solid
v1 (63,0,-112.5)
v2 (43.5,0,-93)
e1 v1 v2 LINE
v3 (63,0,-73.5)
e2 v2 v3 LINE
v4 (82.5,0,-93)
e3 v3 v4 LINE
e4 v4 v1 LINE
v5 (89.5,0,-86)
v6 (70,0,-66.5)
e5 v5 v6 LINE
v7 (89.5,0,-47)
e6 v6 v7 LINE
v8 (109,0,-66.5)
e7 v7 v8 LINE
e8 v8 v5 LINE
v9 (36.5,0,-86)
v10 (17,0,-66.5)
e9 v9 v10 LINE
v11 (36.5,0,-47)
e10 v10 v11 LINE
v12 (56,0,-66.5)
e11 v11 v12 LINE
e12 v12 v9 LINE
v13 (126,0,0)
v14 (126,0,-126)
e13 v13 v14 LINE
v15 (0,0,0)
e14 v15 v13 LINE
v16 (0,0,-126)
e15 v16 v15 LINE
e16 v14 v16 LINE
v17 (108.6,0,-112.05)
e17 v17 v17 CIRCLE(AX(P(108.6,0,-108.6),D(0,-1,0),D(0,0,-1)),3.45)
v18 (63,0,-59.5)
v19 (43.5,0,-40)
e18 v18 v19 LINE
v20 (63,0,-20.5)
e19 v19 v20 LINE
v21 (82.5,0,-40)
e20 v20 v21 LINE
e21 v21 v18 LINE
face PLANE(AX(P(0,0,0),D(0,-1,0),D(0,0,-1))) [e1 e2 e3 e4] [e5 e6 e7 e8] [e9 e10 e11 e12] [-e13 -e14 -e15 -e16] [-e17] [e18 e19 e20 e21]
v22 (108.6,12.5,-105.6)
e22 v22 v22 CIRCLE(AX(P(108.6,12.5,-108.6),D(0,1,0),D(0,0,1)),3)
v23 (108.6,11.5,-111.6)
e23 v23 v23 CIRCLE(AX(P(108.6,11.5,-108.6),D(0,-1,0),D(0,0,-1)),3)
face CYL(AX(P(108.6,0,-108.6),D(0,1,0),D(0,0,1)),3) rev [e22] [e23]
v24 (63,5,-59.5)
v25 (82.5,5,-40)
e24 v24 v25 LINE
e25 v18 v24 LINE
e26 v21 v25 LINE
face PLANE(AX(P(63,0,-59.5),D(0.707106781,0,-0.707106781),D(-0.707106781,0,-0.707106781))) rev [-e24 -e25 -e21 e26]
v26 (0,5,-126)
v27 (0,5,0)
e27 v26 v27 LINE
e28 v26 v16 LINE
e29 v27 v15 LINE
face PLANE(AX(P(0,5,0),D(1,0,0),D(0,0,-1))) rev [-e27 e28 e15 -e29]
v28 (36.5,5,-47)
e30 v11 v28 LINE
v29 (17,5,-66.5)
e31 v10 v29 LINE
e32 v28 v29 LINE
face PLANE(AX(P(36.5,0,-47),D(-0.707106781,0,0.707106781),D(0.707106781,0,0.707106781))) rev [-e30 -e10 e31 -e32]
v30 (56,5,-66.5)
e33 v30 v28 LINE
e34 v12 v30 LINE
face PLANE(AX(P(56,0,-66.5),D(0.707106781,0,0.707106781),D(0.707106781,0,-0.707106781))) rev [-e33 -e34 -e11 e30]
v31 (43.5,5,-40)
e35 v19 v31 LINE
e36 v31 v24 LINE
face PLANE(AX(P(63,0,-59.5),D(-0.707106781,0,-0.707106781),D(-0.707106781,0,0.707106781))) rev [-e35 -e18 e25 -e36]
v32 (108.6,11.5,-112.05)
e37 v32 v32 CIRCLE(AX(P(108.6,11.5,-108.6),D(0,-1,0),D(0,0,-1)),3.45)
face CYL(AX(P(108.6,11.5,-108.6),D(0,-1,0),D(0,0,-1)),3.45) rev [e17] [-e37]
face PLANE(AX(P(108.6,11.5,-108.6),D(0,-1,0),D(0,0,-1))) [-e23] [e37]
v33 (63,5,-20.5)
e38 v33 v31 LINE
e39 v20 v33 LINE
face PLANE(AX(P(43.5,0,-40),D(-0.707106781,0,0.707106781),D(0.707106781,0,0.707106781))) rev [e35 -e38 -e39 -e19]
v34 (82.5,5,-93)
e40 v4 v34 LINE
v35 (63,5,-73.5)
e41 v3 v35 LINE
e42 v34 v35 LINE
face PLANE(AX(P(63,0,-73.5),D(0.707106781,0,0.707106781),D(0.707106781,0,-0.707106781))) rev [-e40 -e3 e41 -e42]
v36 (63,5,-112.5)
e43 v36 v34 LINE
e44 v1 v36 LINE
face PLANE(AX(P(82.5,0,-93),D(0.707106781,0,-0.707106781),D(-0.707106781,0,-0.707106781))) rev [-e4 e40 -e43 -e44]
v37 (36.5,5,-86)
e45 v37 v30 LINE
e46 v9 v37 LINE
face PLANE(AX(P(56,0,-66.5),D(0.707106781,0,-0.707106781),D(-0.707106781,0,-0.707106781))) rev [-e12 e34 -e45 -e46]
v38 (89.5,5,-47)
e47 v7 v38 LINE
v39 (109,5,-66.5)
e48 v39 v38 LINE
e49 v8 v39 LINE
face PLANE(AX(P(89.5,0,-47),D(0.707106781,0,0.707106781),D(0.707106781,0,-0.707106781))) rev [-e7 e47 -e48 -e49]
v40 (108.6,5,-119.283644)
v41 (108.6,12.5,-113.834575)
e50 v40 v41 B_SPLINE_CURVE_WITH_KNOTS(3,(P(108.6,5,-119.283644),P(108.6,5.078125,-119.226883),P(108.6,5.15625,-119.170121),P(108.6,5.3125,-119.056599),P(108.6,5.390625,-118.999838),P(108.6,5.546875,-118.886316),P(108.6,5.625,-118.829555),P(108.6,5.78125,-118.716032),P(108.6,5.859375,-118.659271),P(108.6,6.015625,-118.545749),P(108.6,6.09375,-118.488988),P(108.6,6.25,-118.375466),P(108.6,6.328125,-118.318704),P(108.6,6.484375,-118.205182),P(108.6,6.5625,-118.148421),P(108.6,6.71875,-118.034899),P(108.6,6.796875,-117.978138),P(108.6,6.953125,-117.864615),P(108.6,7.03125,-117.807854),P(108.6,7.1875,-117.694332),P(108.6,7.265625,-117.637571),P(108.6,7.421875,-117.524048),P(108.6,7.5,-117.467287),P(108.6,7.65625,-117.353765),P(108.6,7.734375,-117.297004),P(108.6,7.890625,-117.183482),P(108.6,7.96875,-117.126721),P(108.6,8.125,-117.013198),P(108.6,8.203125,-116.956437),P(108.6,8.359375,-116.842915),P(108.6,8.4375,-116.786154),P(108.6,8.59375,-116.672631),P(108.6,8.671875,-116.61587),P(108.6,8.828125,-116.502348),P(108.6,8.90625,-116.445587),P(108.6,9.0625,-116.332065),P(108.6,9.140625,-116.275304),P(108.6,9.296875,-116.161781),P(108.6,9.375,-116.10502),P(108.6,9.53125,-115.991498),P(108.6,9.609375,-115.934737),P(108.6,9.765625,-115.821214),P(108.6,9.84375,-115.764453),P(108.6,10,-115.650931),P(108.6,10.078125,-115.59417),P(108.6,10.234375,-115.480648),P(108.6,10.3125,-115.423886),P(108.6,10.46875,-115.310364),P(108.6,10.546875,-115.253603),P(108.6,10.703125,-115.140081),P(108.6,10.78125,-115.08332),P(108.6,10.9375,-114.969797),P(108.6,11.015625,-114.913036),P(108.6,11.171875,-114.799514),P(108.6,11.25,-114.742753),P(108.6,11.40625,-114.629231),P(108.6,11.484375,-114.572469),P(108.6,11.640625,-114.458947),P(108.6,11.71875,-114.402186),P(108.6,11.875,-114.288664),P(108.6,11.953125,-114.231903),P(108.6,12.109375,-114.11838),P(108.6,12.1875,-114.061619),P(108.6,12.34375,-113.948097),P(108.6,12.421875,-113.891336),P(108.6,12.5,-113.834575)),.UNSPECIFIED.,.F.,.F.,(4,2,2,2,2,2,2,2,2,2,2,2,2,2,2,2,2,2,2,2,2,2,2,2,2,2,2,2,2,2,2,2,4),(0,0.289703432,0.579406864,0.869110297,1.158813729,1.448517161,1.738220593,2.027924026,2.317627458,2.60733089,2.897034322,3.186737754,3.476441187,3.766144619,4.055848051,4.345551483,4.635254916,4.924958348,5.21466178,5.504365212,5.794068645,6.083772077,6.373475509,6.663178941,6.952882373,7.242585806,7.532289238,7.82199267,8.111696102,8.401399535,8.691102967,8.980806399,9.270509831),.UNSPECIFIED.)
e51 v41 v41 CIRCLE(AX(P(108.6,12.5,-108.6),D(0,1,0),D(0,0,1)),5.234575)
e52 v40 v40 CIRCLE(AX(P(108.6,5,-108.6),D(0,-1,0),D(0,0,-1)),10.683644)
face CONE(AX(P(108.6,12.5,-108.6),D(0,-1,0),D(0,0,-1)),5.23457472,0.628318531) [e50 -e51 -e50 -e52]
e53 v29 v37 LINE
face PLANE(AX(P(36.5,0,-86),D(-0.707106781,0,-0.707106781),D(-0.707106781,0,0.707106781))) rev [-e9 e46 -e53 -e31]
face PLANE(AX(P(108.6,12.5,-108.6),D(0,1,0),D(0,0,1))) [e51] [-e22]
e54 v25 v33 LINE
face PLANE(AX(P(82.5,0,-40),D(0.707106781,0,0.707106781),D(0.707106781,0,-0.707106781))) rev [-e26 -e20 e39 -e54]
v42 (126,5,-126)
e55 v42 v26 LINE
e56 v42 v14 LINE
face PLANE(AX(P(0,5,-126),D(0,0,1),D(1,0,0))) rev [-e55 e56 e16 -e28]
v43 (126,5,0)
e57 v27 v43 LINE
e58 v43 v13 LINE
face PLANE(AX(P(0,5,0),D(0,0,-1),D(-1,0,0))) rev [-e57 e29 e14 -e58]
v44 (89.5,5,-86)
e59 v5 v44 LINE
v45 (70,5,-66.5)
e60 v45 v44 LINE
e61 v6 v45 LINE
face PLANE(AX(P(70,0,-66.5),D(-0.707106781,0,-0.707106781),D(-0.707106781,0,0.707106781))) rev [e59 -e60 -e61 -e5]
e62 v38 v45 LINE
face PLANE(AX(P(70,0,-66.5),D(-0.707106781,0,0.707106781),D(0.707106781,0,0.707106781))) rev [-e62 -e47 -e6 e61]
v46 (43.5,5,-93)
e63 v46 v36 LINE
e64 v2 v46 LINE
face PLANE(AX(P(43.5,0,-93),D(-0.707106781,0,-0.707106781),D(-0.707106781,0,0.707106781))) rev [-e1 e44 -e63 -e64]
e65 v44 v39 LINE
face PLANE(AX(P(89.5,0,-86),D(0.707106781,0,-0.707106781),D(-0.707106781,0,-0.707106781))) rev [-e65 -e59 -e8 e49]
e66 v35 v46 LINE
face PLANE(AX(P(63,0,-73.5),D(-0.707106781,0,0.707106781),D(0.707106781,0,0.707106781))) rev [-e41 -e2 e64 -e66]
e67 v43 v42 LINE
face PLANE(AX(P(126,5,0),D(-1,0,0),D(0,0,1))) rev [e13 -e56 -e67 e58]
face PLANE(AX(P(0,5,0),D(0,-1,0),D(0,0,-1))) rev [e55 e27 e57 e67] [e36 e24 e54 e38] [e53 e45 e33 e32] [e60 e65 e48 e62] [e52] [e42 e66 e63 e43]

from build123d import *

# Parameters (mm, degrees)
SKETCH1_W               = 126
SKETCH1_H               = 126
BOSS_EXTRUDE1_DEPTH     = 5
SKETCH3_R               = 12.5
BOSS_EXTRUDE2_DEPTH     = 7.5
SKETCH4_R               = 3.45
CUT_EXTRUDE1_DEPTH      = 11.5
SKETCH6_R               = 3
CUT_EXTRUDE2_DEPTH      = 179.628805068
CHAMFER1_SIZE           = 10
CHAMFER1_SIZE_2         = 7.26542528
CUT_EXTRUDE3_DEPTH      = 179.348675353
CUT_EXTRUDE3_DEPTH_BACK = 179.348675353


with BuildPart() as part:
    # Sketch1 → Boss-Extrude1 (new body)
    with BuildSketch(Plane(origin=(0, 0, 0), x_dir=(1, 0, 0), z_dir=(0, 1, 0))):
        with Locations((63, 63)):
            Rectangle(SKETCH1_W, SKETCH1_H)
    extrude(amount=BOSS_EXTRUDE1_DEPTH)

    # Sketch3 → Boss-Extrude2 (add)
    with BuildSketch(Plane(origin=(0, 5, 0), x_dir=(1, 0, 0), z_dir=(0, 1, 0))):
        with Locations(Location((108.6, 108.6, 0), (0, 0, 90))):
            Circle(SKETCH3_R)
    extrude(amount=BOSS_EXTRUDE2_DEPTH)

    # Sketch4 → Cut-Extrude1 (cut)
    with BuildSketch(Plane.XZ):
        with Locations(Location((108.6, -108.6, 0), (0, 0, 270))):
            Circle(SKETCH4_R)
    extrude(amount=-CUT_EXTRUDE1_DEPTH, mode=Mode.SUBTRACT)

    # Sketch6 → Cut-Extrude2 (cut, through all)
    with BuildSketch(Plane(origin=(0, 12.5, 0), x_dir=(1, 0, 0), z_dir=(0, 1, 0))):
        with Locations(Location((108.6, 108.6, 0), (0, 0, 270))):
            Circle(SKETCH6_R)
    extrude(amount=-CUT_EXTRUDE2_DEPTH, mode=Mode.SUBTRACT)

    # Chamfer1
    # the kernel refuses this chamfer: 10, 7.26542528 mm, written as the material it takes off along each edge
    with BuildSketch(Plane(origin=(108.6, 12.5, -108.6), x_dir=(0, 0, -1), z_dir=(1, 0, 0))) as chamfer1_piece_1_section:
        Polygon((12.5, -CHAMFER1_SIZE), (12.5 - CHAMFER1_SIZE_2, 0), (12.5, 0), align=None)
    chamfer1_piece_1 = revolve(axis=Axis((108.6, 12.5, -108.6), (0, 1, 0)), mode=Mode.PRIVATE)
    chamfer1_piece_1 = split(chamfer1_piece_1, bisect_by=Plane(origin=(108.6, 5, -100.650989912), z_dir=(0, 1, 0)), keep=Keep.TOP, mode=Mode.PRIVATE)
    add(chamfer1_piece_1, mode=Mode.SUBTRACT)

    # Sketch7 → Cut-Extrude3 (cut, two sides: drawn at the far end of the back side and taken through both)
    with BuildSketch(Plane(origin=(0, 5, 0), x_dir=(1, 0, 0), z_dir=(0, 1, 0)).offset(-CUT_EXTRUDE3_DEPTH_BACK)):
        Polygon((70, 66.5), (89.5, 86), (109, 66.5), (89.5, 47), align=None)
        Polygon((63, 73.5), (82.5, 93), (63, 112.5), (43.5, 93), align=None)
        Polygon((56, 66.5), (36.5, 86), (17, 66.5), (36.5, 47), align=None)
        Polygon((63, 59.5), (43.5, 40), (63, 20.5), (82.5, 40), align=None)
    extrude(amount=CUT_EXTRUDE3_DEPTH + CUT_EXTRUDE3_DEPTH_BACK, mode=Mode.SUBTRACT)


solid = part.part
